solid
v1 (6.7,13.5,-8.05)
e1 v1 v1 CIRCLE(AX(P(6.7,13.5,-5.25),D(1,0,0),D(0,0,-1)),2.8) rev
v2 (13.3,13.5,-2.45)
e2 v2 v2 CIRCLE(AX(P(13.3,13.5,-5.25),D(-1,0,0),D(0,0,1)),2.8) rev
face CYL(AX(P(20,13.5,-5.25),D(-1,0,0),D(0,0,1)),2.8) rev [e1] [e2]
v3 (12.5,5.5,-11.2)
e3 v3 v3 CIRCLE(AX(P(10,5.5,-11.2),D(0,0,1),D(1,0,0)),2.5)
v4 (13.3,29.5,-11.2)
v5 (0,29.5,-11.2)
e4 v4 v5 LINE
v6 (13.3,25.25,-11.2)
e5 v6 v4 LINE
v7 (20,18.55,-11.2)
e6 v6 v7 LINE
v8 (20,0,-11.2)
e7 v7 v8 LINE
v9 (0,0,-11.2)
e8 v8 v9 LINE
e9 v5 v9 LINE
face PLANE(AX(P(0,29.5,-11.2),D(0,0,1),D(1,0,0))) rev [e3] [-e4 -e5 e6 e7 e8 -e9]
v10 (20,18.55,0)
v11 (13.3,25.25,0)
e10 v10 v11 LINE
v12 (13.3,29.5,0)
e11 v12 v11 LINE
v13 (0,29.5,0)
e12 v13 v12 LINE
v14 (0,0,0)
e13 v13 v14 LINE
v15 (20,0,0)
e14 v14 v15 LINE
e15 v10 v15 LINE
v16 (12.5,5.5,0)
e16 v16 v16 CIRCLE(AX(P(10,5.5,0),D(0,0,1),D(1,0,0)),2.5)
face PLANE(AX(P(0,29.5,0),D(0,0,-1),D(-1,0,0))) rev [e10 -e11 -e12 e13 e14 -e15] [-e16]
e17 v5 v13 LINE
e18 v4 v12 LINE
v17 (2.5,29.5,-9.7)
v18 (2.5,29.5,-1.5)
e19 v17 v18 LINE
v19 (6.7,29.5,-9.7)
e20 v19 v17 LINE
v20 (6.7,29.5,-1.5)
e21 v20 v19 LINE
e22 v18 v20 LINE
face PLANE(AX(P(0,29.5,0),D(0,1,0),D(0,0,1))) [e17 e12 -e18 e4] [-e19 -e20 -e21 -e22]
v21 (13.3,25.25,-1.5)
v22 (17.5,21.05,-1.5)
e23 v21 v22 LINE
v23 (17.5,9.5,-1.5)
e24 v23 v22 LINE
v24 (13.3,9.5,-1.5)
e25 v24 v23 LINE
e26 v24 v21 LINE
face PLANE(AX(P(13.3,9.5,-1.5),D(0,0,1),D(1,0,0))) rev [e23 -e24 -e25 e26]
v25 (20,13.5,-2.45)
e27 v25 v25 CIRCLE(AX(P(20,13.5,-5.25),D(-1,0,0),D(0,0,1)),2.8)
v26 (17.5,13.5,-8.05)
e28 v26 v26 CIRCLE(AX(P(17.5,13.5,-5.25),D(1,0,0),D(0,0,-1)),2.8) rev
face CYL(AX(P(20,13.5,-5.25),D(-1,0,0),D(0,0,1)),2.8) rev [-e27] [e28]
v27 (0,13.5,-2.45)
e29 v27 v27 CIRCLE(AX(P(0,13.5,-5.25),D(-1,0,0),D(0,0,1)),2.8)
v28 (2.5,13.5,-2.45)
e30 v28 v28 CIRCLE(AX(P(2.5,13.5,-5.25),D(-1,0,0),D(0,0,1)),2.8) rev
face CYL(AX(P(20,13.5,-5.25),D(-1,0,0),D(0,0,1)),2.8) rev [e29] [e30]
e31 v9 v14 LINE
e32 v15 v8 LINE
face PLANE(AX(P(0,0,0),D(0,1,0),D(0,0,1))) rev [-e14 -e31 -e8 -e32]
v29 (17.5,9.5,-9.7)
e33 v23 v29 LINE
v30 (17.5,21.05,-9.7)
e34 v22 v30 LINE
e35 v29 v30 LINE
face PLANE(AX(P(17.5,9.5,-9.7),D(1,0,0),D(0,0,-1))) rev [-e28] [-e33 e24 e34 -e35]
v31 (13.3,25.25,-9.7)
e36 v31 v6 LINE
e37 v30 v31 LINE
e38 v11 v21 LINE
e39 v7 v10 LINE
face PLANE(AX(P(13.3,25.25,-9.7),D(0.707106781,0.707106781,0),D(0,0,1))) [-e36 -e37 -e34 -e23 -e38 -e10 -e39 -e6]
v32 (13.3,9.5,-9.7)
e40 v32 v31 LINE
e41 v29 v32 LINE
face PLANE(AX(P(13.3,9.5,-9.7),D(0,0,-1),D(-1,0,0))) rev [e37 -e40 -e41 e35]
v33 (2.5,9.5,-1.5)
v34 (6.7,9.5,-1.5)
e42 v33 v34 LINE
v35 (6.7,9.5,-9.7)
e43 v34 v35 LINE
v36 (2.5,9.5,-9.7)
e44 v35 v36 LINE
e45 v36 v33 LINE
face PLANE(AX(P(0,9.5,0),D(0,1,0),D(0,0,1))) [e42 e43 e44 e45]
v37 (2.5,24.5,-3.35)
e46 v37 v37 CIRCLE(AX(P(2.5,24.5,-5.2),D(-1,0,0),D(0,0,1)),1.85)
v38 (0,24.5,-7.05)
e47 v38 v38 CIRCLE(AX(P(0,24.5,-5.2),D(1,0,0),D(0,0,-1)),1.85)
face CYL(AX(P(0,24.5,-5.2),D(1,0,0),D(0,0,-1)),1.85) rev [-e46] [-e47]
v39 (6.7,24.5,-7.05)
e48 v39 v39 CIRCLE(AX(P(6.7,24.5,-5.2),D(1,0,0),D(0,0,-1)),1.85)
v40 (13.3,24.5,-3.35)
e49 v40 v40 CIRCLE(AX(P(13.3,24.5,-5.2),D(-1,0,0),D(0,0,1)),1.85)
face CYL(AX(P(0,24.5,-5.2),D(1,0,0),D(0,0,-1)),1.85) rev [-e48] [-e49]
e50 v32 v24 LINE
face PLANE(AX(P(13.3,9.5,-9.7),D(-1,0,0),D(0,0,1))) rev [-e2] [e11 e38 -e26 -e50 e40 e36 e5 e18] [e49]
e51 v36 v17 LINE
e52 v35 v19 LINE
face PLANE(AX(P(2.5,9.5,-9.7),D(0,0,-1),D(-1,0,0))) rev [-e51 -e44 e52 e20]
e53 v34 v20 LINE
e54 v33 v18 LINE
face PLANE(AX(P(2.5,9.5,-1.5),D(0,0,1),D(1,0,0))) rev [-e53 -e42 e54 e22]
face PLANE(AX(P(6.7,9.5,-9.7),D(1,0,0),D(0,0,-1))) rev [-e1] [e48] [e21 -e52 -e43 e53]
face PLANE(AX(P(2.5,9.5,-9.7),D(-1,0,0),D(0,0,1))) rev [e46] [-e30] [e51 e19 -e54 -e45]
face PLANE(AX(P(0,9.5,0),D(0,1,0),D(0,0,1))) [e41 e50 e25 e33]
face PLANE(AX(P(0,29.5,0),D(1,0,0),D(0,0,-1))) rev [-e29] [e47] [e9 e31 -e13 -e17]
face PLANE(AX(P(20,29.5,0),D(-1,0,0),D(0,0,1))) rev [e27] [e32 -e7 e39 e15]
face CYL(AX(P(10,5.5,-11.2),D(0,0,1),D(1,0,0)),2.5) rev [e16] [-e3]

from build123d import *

# Parameters (mm, degrees)
SKETCH6_W           = 20
SKETCH6_H           = 11.2
BOSS_EXTRUDE2_DEPTH = 29.5
SKETCH7_R           = 2.5
CUT_EXTRUDE4_DEPTH  = 38.358934674
SKETCH8_R           = 2.8
CUT_EXTRUDE5_DEPTH  = 38.358934674
SKETCH9_W           = 4.2
SKETCH9_H           = 8.2
CUT_EXTRUDE6_DEPTH  = 20
SKETCH11_R          = 1.85
CUT_EXTRUDE8_DEPTH  = 38.358934674
SKETCH12_W          = 11.2
SKETCH12_H          = 11
CUT_EXTRUDE9_DEPTH  = 6.7
CHAMFER1_SIZE       = 6.75


with BuildPart() as part:
    # Sketch6 → Boss-Extrude2 (new body)
    with BuildSketch(Plane(origin=(0, 0, 0), x_dir=(1, 0, 0), z_dir=(0, 1, 0))):
        with Locations((10, 5.6)):
            Rectangle(SKETCH6_W, SKETCH6_H)
    extrude(amount=BOSS_EXTRUDE2_DEPTH)

    # Sketch7 → Cut-Extrude4 (cut, through all)
    with BuildSketch(Plane.XY):
        with Locations((10, 5.5)):
            Circle(SKETCH7_R)
    extrude(amount=-CUT_EXTRUDE4_DEPTH, mode=Mode.SUBTRACT)

    # Sketch8 → Cut-Extrude5 (cut, through all)
    with BuildSketch(Plane.ZY):
        with Locations((-5.25, 13.5)):
            Circle(SKETCH8_R)
    extrude(amount=-CUT_EXTRUDE5_DEPTH, mode=Mode.SUBTRACT)

    # Sketch9 → Cut-Extrude6 (cut)
    with BuildSketch(Plane(origin=(0, 29.5, 0), x_dir=(1, 0, 0), z_dir=(0, 1, 0))):
        with Locations((4.6, 5.6)):
            Rectangle(SKETCH9_W, SKETCH9_H)
        with Locations((15.4, 5.6)):
            Rectangle(SKETCH9_W, SKETCH9_H)
    extrude(amount=-CUT_EXTRUDE6_DEPTH, mode=Mode.SUBTRACT)

    # Sketch11 → Cut-Extrude8 (cut, through all)
    with BuildSketch(Plane(origin=(20, 0, 0), x_dir=(0, 0, -1), z_dir=(1, 0, 0))):
        with Locations((5.2, 24.5)):
            Circle(SKETCH11_R)
    extrude(amount=-CUT_EXTRUDE8_DEPTH, mode=Mode.SUBTRACT)

    # Sketch12 → Cut-Extrude9 (cut)
    with BuildSketch(Plane(origin=(20, 0, 0), x_dir=(0, 0, -1), z_dir=(1, 0, 0))):
        with Locations((5.6, 24)):
            Rectangle(SKETCH12_W, SKETCH12_H)
    extrude(amount=-CUT_EXTRUDE9_DEPTH, mode=Mode.SUBTRACT)

    # Chamfer1
    # the kernel refuses this chamfer: 6.75 mm, written as the material it adds along each edge
    with BuildSketch(Plane(origin=(13.3, 18.5, -11.2), x_dir=(-0.027495876610586268, 0.9996219169112968, 0), z_dir=(0, 0, 1))) as chamfer1_piece_1_section:
        Polygon((CHAMFER1_SIZE * 0.999621916911, -CHAMFER1_SIZE * 0.0274958766106), (-CHAMFER1_SIZE * 0.0274958766106, -CHAMFER1_SIZE * 0.999621916911), (0, 0), align=None)
    chamfer1_piece_1 = extrude(amount=1.5, mode=Mode.PRIVATE)
    chamfer1_piece_1 = split(chamfer1_piece_1, bisect_by=Plane(origin=(17.5, 21.005794574, -10.45), z_dir=(-1, 0, 0)), keep=Keep.TOP, mode=Mode.PRIVATE)
    add(chamfer1_piece_1)
    with BuildSketch(Plane(origin=(13.3, 18.5, -11.2), x_dir=(-0.027495876610586268, 0.9996219169112968, 0), z_dir=(0, 0, 1))) as chamfer1_piece_2_section:
        Polygon((CHAMFER1_SIZE * 0.999621916911, -CHAMFER1_SIZE * 0.0274958766106), (-CHAMFER1_SIZE * 0.0274958766106, -CHAMFER1_SIZE * 0.999621916911), (0, 0), align=None)
    chamfer1_piece_2 = extrude(amount=1.5, mode=Mode.PRIVATE)
    chamfer1_piece_2 = split(chamfer1_piece_2, bisect_by=Plane(origin=(17.5, 19.207926364, -10.45), z_dir=(1, 0, 0)), keep=Keep.TOP, mode=Mode.PRIVATE)
    chamfer1_piece_2 = split(chamfer1_piece_2, bisect_by=Plane(origin=(20, 19.207926364, -10.45), z_dir=(-1, 0, 0)), keep=Keep.TOP, mode=Mode.PRIVATE)
    add(chamfer1_piece_2)
    with BuildSketch(Plane(origin=(13.3, 18.5, -11.2), x_dir=(-0.027495876610586268, 0.9996219169112968, 0), z_dir=(0, 0, 1))) as chamfer1_piece_3_section:
        Polygon((CHAMFER1_SIZE * 0.999621916911, -CHAMFER1_SIZE * 0.0274958766106), (-CHAMFER1_SIZE * 0.0274958766106, -CHAMFER1_SIZE * 0.999621916911), (0, 0), align=None)
    chamfer1_piece_3 = extrude(amount=18.858860169, mode=Mode.PRIVATE)
    chamfer1_piece_3 = split(chamfer1_piece_3, bisect_by=Plane(origin=(18.428491319, 19.207926364, -9.7), z_dir=(0, 0, 1)), keep=Keep.TOP, mode=Mode.PRIVATE)
    chamfer1_piece_3 = split(chamfer1_piece_3, bisect_by=Plane(origin=(18.428491319, 19.207926364, -1.5), z_dir=(0, 0, -1)), keep=Keep.TOP, mode=Mode.PRIVATE)
    chamfer1_piece_3 = split(chamfer1_piece_3, bisect_by=Plane(origin=(17.5, 19.207926364, -5.6), z_dir=(1, 0, 0)), keep=Keep.TOP, mode=Mode.PRIVATE)
    chamfer1_piece_3 = split(chamfer1_piece_3, bisect_by=Plane(origin=(20, 19.207926364, -5.6), z_dir=(-1, 0, 0)), keep=Keep.TOP, mode=Mode.PRIVATE)
    add(chamfer1_piece_3)
    with BuildSketch(Plane(origin=(13.3, 18.5, -11.2), x_dir=(-0.027495876610586268, 0.9996219169112968, 0), z_dir=(0, 0, 1))) as chamfer1_piece_4_section:
        Polygon((CHAMFER1_SIZE * 0.999621916911, -CHAMFER1_SIZE * 0.0274958766106), (-CHAMFER1_SIZE * 0.0274958766106, -CHAMFER1_SIZE * 0.999621916911), (0, 0), align=None)
    chamfer1_piece_4 = extrude(amount=18.858860169, mode=Mode.PRIVATE)
    chamfer1_piece_4 = split(chamfer1_piece_4, bisect_by=Plane(origin=(14.991498442, 21.005794574, 0), z_dir=(0, 0, -1)), keep=Keep.TOP, mode=Mode.PRIVATE)
    chamfer1_piece_4 = split(chamfer1_piece_4, bisect_by=Plane(origin=(14.991498442, 21.005794574, -1.5), z_dir=(0, 0, 1)), keep=Keep.TOP, mode=Mode.PRIVATE)
    chamfer1_piece_4 = split(chamfer1_piece_4, bisect_by=Plane(origin=(17.5, 21.005794574, -0.75), z_dir=(-1, 0, 0)), keep=Keep.TOP, mode=Mode.PRIVATE)
    add(chamfer1_piece_4)
    with BuildSketch(Plane(origin=(13.3, 18.5, -11.2), x_dir=(-0.027495876610586268, 0.9996219169112968, 0), z_dir=(0, 0, 1))) as chamfer1_piece_5_section:
        Polygon((CHAMFER1_SIZE * 0.999621916911, -CHAMFER1_SIZE * 0.0274958766106), (-CHAMFER1_SIZE * 0.0274958766106, -CHAMFER1_SIZE * 0.999621916911), (0, 0), align=None)
    chamfer1_piece_5 = extrude(amount=18.858860169, mode=Mode.PRIVATE)
    chamfer1_piece_5 = split(chamfer1_piece_5, bisect_by=Plane(origin=(18.428491319, 19.207926364, 0), z_dir=(0, 0, -1)), keep=Keep.TOP, mode=Mode.PRIVATE)
    chamfer1_piece_5 = split(chamfer1_piece_5, bisect_by=Plane(origin=(18.428491319, 19.207926364, -1.5), z_dir=(0, 0, 1)), keep=Keep.TOP, mode=Mode.PRIVATE)
    chamfer1_piece_5 = split(chamfer1_piece_5, bisect_by=Plane(origin=(17.5, 19.207926364, -0.75), z_dir=(1, 0, 0)), keep=Keep.TOP, mode=Mode.PRIVATE)
    chamfer1_piece_5 = split(chamfer1_piece_5, bisect_by=Plane(origin=(20, 19.207926364, -0.75), z_dir=(-1, 0, 0)), keep=Keep.TOP, mode=Mode.PRIVATE)
    add(chamfer1_piece_5)


solid = part.part
